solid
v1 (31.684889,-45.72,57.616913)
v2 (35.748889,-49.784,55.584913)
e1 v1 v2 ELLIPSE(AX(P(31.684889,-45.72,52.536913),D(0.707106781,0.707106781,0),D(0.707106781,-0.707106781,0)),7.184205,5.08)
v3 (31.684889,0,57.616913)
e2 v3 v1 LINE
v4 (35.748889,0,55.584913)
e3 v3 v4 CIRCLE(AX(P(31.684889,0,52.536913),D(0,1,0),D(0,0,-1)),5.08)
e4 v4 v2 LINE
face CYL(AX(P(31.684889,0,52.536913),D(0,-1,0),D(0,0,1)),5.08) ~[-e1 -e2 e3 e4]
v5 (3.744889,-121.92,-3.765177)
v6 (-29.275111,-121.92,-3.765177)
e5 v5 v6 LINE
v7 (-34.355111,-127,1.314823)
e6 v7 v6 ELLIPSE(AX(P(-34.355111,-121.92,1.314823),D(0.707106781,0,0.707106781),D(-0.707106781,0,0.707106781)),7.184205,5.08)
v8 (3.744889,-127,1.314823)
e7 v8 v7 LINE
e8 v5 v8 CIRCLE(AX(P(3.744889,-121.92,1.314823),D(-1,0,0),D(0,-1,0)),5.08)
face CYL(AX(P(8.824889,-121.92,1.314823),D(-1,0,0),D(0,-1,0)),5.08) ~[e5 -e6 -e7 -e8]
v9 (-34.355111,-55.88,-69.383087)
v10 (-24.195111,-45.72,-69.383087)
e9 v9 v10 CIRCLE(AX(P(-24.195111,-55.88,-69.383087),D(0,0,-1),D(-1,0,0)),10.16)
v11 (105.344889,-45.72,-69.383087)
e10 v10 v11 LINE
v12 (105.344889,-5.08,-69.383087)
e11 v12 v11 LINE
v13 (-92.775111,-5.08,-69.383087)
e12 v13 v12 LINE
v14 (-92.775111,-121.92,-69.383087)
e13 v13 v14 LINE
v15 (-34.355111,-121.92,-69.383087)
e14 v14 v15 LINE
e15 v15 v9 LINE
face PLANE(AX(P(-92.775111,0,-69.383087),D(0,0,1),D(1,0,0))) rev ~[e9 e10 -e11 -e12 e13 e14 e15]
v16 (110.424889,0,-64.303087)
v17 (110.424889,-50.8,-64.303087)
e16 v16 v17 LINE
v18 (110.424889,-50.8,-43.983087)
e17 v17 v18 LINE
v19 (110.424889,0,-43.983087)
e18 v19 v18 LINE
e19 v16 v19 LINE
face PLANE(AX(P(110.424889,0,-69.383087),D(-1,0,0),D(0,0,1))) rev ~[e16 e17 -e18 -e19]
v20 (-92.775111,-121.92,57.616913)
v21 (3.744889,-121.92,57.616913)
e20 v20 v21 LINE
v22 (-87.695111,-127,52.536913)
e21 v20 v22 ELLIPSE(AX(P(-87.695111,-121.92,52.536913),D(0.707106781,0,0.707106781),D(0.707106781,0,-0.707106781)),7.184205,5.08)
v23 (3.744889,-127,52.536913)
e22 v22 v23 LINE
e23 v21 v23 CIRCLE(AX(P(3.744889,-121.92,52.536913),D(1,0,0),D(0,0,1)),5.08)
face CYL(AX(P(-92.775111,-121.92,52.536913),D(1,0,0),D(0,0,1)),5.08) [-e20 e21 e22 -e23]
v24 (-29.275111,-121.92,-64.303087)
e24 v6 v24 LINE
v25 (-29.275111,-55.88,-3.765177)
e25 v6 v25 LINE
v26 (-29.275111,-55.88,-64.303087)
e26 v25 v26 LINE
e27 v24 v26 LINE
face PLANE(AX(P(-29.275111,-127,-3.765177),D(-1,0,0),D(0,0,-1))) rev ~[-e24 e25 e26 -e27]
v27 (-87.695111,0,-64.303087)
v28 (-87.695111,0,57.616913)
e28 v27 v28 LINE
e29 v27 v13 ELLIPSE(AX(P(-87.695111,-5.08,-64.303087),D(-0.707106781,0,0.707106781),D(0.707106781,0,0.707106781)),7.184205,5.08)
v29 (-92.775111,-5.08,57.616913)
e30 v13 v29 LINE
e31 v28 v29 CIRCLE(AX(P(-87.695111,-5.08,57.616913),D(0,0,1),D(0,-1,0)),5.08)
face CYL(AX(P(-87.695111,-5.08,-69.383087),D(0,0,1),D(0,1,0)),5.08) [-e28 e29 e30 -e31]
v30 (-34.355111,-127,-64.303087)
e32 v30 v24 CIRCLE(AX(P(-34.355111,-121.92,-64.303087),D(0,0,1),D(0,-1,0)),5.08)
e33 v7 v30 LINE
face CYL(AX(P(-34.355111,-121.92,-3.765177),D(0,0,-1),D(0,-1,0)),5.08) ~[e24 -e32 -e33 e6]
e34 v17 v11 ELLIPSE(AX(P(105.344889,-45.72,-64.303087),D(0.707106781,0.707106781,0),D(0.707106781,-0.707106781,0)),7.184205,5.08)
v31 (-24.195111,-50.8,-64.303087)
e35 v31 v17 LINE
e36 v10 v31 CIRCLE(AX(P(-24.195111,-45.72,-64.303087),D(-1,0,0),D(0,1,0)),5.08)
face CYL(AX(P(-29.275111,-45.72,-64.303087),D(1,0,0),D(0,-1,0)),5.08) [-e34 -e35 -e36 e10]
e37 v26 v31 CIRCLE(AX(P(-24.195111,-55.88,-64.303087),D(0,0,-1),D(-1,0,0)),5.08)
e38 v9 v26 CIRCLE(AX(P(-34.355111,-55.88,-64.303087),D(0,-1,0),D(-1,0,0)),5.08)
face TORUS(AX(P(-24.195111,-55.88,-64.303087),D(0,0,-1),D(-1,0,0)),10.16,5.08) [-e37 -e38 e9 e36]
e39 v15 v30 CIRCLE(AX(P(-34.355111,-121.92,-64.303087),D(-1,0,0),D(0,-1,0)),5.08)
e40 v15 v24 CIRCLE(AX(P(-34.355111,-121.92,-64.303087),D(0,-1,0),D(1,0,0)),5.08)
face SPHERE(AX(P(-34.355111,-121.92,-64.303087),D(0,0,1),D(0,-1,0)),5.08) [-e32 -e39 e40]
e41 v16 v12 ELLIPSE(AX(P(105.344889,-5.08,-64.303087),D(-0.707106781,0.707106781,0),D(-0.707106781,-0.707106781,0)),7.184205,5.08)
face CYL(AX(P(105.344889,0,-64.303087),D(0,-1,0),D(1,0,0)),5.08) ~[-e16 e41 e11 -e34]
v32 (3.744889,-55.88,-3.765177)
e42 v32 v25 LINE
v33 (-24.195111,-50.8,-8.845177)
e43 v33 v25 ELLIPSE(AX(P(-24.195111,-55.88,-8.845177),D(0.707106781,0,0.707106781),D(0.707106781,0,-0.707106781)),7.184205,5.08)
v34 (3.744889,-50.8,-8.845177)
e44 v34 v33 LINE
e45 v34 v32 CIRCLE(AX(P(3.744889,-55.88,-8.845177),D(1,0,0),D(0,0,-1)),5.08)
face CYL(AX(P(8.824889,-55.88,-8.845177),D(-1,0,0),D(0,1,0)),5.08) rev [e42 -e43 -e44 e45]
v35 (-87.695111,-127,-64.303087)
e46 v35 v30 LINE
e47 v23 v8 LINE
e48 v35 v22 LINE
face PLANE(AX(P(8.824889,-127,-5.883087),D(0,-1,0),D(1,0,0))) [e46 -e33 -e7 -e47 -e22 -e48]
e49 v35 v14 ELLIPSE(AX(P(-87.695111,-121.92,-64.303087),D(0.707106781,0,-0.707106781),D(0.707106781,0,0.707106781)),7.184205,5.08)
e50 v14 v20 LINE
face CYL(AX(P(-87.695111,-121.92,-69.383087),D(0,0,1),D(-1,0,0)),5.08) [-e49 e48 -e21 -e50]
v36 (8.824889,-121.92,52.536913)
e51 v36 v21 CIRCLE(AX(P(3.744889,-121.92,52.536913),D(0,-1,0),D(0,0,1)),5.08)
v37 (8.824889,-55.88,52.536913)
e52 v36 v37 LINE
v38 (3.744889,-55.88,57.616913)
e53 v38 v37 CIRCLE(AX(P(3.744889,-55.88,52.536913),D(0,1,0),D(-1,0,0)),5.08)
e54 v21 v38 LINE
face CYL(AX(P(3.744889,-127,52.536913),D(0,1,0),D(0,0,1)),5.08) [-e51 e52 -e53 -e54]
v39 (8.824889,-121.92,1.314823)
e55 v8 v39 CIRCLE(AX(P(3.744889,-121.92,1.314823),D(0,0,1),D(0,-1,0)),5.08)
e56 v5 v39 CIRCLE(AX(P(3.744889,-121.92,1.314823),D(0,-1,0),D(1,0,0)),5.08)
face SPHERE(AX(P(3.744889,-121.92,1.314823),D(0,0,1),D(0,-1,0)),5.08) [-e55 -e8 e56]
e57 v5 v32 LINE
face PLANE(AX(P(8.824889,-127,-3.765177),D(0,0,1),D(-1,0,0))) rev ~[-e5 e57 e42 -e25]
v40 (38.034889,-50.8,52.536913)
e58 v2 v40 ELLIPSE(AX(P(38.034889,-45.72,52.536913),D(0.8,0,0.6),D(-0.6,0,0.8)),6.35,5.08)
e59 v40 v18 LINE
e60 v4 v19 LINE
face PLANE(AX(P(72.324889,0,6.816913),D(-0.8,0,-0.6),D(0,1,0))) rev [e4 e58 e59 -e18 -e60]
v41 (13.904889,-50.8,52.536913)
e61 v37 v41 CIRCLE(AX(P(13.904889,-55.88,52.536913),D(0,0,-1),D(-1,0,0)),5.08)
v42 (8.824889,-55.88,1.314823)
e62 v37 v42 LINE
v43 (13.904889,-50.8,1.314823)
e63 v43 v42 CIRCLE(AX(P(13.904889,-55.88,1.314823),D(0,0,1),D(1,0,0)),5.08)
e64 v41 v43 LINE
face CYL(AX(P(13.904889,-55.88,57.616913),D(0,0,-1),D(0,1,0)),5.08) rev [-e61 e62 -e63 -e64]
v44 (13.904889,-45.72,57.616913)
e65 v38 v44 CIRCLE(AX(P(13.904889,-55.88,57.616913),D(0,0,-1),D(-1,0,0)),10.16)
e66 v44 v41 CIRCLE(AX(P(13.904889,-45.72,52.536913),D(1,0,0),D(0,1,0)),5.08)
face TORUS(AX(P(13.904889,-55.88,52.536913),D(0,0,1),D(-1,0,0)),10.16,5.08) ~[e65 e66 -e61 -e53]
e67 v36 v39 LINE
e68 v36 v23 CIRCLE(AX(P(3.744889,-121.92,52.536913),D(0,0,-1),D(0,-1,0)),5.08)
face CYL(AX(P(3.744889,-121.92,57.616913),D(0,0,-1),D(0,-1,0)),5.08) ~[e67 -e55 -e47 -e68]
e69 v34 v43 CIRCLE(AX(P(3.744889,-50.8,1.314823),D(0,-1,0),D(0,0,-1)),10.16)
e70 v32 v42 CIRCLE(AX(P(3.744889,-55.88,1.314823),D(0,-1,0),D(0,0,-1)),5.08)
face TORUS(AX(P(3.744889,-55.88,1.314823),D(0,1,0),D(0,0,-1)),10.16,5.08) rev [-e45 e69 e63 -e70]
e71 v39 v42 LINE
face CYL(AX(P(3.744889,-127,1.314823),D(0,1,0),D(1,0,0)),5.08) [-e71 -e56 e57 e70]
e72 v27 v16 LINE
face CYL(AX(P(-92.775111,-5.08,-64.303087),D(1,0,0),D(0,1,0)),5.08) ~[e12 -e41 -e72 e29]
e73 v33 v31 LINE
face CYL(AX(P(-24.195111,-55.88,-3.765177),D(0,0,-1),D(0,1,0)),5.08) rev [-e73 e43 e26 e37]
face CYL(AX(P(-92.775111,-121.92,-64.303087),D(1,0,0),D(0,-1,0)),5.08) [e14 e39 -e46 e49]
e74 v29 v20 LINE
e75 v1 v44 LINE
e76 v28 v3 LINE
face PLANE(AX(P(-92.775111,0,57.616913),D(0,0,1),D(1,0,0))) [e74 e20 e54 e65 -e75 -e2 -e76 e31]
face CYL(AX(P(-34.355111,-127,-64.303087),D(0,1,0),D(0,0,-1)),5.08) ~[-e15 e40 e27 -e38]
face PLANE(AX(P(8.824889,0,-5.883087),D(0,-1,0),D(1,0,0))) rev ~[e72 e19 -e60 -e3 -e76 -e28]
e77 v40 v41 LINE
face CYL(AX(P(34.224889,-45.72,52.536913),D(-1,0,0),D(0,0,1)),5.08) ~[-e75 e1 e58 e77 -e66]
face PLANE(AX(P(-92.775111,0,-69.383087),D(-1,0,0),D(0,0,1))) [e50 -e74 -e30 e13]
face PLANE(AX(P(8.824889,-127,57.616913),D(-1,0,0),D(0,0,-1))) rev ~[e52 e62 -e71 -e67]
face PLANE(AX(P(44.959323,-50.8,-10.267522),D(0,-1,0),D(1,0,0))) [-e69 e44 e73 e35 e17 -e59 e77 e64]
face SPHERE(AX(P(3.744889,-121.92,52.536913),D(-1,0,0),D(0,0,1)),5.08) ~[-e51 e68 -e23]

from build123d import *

# Parameters (mm, degrees)
F0_W     = 203.2
F0_H     = 127
F1_DEPTH = 127
F3_DEPTH = 76.2
F4_SIZE2 = 101.6
F4_SIZE  = 76.2
F5_R     = 5.08


with BuildPart() as f1:
    # F0 (on Front) → F1 (new body)
    with BuildSketch(Plane.XZ):
        with Locations((8.8248885557, -5.8830874041)):
            Rectangle(F0_W, F0_H)
    extrude(amount=F1_DEPTH)

    # F2 (on face) → F3 (cut)
    with BuildSketch(Plane.XZ.offset(127)):
        Polygon((110.4248885557, 57.6169125959), (8.8248885557, 57.6169125959), (8.8248885557, -3.765176516), (-29.2751114443, -3.765176516), (-29.2751114443, -69.3830874041), (110.4248885557, -69.3830874041), align=None)
    extrude(amount=-F3_DEPTH, mode=Mode.SUBTRACT)

    # F4
    f4_edges = [f1.edges().sort_by_distance(p)[0] for p in [
        (110.424889, -25.4, 57.616913),
    ]]
    f4_side = f1.faces().sort_by_distance((-12.94654, -52.614286, 57.616913))[0]
    chamfer(f4_edges, length=F4_SIZE, length2=F4_SIZE2, reference=f4_side)

    # F5
    f5_edges = [f1.edges().sort_by_distance(p)[0] for p in [
        (-41.975111, -127, 57.616913),
        (8.824889, -88.9, 57.616913),
        (21.524889, -50.8, 57.616913),
        (34.224889, -25.4, 57.616913),
        (8.824889, -50.8, 26.925868),
        (8.824889, -127, 26.925868),
        (-10.225111, -127, -3.765177),
        (8.824889, -88.9, -3.765177),
        (-29.275111, -127, -36.574132),
        (-29.275111, -50.8, -36.574132),
        (-61.025111, -127, -69.383087),
        (-29.275111, -88.9, -69.383087),
        (40.574889, -50.8, -69.383087),
        (110.424889, -25.4, -69.383087),
        (-92.775111, -127, -5.883087),
        (8.824889, 0, -69.383087),
        (-92.775111, 0, -5.883087),
        (-10.225111, -50.8, -3.765177),
    ]]
    fillet(f5_edges, radius=F5_R)


solid = f1.part
